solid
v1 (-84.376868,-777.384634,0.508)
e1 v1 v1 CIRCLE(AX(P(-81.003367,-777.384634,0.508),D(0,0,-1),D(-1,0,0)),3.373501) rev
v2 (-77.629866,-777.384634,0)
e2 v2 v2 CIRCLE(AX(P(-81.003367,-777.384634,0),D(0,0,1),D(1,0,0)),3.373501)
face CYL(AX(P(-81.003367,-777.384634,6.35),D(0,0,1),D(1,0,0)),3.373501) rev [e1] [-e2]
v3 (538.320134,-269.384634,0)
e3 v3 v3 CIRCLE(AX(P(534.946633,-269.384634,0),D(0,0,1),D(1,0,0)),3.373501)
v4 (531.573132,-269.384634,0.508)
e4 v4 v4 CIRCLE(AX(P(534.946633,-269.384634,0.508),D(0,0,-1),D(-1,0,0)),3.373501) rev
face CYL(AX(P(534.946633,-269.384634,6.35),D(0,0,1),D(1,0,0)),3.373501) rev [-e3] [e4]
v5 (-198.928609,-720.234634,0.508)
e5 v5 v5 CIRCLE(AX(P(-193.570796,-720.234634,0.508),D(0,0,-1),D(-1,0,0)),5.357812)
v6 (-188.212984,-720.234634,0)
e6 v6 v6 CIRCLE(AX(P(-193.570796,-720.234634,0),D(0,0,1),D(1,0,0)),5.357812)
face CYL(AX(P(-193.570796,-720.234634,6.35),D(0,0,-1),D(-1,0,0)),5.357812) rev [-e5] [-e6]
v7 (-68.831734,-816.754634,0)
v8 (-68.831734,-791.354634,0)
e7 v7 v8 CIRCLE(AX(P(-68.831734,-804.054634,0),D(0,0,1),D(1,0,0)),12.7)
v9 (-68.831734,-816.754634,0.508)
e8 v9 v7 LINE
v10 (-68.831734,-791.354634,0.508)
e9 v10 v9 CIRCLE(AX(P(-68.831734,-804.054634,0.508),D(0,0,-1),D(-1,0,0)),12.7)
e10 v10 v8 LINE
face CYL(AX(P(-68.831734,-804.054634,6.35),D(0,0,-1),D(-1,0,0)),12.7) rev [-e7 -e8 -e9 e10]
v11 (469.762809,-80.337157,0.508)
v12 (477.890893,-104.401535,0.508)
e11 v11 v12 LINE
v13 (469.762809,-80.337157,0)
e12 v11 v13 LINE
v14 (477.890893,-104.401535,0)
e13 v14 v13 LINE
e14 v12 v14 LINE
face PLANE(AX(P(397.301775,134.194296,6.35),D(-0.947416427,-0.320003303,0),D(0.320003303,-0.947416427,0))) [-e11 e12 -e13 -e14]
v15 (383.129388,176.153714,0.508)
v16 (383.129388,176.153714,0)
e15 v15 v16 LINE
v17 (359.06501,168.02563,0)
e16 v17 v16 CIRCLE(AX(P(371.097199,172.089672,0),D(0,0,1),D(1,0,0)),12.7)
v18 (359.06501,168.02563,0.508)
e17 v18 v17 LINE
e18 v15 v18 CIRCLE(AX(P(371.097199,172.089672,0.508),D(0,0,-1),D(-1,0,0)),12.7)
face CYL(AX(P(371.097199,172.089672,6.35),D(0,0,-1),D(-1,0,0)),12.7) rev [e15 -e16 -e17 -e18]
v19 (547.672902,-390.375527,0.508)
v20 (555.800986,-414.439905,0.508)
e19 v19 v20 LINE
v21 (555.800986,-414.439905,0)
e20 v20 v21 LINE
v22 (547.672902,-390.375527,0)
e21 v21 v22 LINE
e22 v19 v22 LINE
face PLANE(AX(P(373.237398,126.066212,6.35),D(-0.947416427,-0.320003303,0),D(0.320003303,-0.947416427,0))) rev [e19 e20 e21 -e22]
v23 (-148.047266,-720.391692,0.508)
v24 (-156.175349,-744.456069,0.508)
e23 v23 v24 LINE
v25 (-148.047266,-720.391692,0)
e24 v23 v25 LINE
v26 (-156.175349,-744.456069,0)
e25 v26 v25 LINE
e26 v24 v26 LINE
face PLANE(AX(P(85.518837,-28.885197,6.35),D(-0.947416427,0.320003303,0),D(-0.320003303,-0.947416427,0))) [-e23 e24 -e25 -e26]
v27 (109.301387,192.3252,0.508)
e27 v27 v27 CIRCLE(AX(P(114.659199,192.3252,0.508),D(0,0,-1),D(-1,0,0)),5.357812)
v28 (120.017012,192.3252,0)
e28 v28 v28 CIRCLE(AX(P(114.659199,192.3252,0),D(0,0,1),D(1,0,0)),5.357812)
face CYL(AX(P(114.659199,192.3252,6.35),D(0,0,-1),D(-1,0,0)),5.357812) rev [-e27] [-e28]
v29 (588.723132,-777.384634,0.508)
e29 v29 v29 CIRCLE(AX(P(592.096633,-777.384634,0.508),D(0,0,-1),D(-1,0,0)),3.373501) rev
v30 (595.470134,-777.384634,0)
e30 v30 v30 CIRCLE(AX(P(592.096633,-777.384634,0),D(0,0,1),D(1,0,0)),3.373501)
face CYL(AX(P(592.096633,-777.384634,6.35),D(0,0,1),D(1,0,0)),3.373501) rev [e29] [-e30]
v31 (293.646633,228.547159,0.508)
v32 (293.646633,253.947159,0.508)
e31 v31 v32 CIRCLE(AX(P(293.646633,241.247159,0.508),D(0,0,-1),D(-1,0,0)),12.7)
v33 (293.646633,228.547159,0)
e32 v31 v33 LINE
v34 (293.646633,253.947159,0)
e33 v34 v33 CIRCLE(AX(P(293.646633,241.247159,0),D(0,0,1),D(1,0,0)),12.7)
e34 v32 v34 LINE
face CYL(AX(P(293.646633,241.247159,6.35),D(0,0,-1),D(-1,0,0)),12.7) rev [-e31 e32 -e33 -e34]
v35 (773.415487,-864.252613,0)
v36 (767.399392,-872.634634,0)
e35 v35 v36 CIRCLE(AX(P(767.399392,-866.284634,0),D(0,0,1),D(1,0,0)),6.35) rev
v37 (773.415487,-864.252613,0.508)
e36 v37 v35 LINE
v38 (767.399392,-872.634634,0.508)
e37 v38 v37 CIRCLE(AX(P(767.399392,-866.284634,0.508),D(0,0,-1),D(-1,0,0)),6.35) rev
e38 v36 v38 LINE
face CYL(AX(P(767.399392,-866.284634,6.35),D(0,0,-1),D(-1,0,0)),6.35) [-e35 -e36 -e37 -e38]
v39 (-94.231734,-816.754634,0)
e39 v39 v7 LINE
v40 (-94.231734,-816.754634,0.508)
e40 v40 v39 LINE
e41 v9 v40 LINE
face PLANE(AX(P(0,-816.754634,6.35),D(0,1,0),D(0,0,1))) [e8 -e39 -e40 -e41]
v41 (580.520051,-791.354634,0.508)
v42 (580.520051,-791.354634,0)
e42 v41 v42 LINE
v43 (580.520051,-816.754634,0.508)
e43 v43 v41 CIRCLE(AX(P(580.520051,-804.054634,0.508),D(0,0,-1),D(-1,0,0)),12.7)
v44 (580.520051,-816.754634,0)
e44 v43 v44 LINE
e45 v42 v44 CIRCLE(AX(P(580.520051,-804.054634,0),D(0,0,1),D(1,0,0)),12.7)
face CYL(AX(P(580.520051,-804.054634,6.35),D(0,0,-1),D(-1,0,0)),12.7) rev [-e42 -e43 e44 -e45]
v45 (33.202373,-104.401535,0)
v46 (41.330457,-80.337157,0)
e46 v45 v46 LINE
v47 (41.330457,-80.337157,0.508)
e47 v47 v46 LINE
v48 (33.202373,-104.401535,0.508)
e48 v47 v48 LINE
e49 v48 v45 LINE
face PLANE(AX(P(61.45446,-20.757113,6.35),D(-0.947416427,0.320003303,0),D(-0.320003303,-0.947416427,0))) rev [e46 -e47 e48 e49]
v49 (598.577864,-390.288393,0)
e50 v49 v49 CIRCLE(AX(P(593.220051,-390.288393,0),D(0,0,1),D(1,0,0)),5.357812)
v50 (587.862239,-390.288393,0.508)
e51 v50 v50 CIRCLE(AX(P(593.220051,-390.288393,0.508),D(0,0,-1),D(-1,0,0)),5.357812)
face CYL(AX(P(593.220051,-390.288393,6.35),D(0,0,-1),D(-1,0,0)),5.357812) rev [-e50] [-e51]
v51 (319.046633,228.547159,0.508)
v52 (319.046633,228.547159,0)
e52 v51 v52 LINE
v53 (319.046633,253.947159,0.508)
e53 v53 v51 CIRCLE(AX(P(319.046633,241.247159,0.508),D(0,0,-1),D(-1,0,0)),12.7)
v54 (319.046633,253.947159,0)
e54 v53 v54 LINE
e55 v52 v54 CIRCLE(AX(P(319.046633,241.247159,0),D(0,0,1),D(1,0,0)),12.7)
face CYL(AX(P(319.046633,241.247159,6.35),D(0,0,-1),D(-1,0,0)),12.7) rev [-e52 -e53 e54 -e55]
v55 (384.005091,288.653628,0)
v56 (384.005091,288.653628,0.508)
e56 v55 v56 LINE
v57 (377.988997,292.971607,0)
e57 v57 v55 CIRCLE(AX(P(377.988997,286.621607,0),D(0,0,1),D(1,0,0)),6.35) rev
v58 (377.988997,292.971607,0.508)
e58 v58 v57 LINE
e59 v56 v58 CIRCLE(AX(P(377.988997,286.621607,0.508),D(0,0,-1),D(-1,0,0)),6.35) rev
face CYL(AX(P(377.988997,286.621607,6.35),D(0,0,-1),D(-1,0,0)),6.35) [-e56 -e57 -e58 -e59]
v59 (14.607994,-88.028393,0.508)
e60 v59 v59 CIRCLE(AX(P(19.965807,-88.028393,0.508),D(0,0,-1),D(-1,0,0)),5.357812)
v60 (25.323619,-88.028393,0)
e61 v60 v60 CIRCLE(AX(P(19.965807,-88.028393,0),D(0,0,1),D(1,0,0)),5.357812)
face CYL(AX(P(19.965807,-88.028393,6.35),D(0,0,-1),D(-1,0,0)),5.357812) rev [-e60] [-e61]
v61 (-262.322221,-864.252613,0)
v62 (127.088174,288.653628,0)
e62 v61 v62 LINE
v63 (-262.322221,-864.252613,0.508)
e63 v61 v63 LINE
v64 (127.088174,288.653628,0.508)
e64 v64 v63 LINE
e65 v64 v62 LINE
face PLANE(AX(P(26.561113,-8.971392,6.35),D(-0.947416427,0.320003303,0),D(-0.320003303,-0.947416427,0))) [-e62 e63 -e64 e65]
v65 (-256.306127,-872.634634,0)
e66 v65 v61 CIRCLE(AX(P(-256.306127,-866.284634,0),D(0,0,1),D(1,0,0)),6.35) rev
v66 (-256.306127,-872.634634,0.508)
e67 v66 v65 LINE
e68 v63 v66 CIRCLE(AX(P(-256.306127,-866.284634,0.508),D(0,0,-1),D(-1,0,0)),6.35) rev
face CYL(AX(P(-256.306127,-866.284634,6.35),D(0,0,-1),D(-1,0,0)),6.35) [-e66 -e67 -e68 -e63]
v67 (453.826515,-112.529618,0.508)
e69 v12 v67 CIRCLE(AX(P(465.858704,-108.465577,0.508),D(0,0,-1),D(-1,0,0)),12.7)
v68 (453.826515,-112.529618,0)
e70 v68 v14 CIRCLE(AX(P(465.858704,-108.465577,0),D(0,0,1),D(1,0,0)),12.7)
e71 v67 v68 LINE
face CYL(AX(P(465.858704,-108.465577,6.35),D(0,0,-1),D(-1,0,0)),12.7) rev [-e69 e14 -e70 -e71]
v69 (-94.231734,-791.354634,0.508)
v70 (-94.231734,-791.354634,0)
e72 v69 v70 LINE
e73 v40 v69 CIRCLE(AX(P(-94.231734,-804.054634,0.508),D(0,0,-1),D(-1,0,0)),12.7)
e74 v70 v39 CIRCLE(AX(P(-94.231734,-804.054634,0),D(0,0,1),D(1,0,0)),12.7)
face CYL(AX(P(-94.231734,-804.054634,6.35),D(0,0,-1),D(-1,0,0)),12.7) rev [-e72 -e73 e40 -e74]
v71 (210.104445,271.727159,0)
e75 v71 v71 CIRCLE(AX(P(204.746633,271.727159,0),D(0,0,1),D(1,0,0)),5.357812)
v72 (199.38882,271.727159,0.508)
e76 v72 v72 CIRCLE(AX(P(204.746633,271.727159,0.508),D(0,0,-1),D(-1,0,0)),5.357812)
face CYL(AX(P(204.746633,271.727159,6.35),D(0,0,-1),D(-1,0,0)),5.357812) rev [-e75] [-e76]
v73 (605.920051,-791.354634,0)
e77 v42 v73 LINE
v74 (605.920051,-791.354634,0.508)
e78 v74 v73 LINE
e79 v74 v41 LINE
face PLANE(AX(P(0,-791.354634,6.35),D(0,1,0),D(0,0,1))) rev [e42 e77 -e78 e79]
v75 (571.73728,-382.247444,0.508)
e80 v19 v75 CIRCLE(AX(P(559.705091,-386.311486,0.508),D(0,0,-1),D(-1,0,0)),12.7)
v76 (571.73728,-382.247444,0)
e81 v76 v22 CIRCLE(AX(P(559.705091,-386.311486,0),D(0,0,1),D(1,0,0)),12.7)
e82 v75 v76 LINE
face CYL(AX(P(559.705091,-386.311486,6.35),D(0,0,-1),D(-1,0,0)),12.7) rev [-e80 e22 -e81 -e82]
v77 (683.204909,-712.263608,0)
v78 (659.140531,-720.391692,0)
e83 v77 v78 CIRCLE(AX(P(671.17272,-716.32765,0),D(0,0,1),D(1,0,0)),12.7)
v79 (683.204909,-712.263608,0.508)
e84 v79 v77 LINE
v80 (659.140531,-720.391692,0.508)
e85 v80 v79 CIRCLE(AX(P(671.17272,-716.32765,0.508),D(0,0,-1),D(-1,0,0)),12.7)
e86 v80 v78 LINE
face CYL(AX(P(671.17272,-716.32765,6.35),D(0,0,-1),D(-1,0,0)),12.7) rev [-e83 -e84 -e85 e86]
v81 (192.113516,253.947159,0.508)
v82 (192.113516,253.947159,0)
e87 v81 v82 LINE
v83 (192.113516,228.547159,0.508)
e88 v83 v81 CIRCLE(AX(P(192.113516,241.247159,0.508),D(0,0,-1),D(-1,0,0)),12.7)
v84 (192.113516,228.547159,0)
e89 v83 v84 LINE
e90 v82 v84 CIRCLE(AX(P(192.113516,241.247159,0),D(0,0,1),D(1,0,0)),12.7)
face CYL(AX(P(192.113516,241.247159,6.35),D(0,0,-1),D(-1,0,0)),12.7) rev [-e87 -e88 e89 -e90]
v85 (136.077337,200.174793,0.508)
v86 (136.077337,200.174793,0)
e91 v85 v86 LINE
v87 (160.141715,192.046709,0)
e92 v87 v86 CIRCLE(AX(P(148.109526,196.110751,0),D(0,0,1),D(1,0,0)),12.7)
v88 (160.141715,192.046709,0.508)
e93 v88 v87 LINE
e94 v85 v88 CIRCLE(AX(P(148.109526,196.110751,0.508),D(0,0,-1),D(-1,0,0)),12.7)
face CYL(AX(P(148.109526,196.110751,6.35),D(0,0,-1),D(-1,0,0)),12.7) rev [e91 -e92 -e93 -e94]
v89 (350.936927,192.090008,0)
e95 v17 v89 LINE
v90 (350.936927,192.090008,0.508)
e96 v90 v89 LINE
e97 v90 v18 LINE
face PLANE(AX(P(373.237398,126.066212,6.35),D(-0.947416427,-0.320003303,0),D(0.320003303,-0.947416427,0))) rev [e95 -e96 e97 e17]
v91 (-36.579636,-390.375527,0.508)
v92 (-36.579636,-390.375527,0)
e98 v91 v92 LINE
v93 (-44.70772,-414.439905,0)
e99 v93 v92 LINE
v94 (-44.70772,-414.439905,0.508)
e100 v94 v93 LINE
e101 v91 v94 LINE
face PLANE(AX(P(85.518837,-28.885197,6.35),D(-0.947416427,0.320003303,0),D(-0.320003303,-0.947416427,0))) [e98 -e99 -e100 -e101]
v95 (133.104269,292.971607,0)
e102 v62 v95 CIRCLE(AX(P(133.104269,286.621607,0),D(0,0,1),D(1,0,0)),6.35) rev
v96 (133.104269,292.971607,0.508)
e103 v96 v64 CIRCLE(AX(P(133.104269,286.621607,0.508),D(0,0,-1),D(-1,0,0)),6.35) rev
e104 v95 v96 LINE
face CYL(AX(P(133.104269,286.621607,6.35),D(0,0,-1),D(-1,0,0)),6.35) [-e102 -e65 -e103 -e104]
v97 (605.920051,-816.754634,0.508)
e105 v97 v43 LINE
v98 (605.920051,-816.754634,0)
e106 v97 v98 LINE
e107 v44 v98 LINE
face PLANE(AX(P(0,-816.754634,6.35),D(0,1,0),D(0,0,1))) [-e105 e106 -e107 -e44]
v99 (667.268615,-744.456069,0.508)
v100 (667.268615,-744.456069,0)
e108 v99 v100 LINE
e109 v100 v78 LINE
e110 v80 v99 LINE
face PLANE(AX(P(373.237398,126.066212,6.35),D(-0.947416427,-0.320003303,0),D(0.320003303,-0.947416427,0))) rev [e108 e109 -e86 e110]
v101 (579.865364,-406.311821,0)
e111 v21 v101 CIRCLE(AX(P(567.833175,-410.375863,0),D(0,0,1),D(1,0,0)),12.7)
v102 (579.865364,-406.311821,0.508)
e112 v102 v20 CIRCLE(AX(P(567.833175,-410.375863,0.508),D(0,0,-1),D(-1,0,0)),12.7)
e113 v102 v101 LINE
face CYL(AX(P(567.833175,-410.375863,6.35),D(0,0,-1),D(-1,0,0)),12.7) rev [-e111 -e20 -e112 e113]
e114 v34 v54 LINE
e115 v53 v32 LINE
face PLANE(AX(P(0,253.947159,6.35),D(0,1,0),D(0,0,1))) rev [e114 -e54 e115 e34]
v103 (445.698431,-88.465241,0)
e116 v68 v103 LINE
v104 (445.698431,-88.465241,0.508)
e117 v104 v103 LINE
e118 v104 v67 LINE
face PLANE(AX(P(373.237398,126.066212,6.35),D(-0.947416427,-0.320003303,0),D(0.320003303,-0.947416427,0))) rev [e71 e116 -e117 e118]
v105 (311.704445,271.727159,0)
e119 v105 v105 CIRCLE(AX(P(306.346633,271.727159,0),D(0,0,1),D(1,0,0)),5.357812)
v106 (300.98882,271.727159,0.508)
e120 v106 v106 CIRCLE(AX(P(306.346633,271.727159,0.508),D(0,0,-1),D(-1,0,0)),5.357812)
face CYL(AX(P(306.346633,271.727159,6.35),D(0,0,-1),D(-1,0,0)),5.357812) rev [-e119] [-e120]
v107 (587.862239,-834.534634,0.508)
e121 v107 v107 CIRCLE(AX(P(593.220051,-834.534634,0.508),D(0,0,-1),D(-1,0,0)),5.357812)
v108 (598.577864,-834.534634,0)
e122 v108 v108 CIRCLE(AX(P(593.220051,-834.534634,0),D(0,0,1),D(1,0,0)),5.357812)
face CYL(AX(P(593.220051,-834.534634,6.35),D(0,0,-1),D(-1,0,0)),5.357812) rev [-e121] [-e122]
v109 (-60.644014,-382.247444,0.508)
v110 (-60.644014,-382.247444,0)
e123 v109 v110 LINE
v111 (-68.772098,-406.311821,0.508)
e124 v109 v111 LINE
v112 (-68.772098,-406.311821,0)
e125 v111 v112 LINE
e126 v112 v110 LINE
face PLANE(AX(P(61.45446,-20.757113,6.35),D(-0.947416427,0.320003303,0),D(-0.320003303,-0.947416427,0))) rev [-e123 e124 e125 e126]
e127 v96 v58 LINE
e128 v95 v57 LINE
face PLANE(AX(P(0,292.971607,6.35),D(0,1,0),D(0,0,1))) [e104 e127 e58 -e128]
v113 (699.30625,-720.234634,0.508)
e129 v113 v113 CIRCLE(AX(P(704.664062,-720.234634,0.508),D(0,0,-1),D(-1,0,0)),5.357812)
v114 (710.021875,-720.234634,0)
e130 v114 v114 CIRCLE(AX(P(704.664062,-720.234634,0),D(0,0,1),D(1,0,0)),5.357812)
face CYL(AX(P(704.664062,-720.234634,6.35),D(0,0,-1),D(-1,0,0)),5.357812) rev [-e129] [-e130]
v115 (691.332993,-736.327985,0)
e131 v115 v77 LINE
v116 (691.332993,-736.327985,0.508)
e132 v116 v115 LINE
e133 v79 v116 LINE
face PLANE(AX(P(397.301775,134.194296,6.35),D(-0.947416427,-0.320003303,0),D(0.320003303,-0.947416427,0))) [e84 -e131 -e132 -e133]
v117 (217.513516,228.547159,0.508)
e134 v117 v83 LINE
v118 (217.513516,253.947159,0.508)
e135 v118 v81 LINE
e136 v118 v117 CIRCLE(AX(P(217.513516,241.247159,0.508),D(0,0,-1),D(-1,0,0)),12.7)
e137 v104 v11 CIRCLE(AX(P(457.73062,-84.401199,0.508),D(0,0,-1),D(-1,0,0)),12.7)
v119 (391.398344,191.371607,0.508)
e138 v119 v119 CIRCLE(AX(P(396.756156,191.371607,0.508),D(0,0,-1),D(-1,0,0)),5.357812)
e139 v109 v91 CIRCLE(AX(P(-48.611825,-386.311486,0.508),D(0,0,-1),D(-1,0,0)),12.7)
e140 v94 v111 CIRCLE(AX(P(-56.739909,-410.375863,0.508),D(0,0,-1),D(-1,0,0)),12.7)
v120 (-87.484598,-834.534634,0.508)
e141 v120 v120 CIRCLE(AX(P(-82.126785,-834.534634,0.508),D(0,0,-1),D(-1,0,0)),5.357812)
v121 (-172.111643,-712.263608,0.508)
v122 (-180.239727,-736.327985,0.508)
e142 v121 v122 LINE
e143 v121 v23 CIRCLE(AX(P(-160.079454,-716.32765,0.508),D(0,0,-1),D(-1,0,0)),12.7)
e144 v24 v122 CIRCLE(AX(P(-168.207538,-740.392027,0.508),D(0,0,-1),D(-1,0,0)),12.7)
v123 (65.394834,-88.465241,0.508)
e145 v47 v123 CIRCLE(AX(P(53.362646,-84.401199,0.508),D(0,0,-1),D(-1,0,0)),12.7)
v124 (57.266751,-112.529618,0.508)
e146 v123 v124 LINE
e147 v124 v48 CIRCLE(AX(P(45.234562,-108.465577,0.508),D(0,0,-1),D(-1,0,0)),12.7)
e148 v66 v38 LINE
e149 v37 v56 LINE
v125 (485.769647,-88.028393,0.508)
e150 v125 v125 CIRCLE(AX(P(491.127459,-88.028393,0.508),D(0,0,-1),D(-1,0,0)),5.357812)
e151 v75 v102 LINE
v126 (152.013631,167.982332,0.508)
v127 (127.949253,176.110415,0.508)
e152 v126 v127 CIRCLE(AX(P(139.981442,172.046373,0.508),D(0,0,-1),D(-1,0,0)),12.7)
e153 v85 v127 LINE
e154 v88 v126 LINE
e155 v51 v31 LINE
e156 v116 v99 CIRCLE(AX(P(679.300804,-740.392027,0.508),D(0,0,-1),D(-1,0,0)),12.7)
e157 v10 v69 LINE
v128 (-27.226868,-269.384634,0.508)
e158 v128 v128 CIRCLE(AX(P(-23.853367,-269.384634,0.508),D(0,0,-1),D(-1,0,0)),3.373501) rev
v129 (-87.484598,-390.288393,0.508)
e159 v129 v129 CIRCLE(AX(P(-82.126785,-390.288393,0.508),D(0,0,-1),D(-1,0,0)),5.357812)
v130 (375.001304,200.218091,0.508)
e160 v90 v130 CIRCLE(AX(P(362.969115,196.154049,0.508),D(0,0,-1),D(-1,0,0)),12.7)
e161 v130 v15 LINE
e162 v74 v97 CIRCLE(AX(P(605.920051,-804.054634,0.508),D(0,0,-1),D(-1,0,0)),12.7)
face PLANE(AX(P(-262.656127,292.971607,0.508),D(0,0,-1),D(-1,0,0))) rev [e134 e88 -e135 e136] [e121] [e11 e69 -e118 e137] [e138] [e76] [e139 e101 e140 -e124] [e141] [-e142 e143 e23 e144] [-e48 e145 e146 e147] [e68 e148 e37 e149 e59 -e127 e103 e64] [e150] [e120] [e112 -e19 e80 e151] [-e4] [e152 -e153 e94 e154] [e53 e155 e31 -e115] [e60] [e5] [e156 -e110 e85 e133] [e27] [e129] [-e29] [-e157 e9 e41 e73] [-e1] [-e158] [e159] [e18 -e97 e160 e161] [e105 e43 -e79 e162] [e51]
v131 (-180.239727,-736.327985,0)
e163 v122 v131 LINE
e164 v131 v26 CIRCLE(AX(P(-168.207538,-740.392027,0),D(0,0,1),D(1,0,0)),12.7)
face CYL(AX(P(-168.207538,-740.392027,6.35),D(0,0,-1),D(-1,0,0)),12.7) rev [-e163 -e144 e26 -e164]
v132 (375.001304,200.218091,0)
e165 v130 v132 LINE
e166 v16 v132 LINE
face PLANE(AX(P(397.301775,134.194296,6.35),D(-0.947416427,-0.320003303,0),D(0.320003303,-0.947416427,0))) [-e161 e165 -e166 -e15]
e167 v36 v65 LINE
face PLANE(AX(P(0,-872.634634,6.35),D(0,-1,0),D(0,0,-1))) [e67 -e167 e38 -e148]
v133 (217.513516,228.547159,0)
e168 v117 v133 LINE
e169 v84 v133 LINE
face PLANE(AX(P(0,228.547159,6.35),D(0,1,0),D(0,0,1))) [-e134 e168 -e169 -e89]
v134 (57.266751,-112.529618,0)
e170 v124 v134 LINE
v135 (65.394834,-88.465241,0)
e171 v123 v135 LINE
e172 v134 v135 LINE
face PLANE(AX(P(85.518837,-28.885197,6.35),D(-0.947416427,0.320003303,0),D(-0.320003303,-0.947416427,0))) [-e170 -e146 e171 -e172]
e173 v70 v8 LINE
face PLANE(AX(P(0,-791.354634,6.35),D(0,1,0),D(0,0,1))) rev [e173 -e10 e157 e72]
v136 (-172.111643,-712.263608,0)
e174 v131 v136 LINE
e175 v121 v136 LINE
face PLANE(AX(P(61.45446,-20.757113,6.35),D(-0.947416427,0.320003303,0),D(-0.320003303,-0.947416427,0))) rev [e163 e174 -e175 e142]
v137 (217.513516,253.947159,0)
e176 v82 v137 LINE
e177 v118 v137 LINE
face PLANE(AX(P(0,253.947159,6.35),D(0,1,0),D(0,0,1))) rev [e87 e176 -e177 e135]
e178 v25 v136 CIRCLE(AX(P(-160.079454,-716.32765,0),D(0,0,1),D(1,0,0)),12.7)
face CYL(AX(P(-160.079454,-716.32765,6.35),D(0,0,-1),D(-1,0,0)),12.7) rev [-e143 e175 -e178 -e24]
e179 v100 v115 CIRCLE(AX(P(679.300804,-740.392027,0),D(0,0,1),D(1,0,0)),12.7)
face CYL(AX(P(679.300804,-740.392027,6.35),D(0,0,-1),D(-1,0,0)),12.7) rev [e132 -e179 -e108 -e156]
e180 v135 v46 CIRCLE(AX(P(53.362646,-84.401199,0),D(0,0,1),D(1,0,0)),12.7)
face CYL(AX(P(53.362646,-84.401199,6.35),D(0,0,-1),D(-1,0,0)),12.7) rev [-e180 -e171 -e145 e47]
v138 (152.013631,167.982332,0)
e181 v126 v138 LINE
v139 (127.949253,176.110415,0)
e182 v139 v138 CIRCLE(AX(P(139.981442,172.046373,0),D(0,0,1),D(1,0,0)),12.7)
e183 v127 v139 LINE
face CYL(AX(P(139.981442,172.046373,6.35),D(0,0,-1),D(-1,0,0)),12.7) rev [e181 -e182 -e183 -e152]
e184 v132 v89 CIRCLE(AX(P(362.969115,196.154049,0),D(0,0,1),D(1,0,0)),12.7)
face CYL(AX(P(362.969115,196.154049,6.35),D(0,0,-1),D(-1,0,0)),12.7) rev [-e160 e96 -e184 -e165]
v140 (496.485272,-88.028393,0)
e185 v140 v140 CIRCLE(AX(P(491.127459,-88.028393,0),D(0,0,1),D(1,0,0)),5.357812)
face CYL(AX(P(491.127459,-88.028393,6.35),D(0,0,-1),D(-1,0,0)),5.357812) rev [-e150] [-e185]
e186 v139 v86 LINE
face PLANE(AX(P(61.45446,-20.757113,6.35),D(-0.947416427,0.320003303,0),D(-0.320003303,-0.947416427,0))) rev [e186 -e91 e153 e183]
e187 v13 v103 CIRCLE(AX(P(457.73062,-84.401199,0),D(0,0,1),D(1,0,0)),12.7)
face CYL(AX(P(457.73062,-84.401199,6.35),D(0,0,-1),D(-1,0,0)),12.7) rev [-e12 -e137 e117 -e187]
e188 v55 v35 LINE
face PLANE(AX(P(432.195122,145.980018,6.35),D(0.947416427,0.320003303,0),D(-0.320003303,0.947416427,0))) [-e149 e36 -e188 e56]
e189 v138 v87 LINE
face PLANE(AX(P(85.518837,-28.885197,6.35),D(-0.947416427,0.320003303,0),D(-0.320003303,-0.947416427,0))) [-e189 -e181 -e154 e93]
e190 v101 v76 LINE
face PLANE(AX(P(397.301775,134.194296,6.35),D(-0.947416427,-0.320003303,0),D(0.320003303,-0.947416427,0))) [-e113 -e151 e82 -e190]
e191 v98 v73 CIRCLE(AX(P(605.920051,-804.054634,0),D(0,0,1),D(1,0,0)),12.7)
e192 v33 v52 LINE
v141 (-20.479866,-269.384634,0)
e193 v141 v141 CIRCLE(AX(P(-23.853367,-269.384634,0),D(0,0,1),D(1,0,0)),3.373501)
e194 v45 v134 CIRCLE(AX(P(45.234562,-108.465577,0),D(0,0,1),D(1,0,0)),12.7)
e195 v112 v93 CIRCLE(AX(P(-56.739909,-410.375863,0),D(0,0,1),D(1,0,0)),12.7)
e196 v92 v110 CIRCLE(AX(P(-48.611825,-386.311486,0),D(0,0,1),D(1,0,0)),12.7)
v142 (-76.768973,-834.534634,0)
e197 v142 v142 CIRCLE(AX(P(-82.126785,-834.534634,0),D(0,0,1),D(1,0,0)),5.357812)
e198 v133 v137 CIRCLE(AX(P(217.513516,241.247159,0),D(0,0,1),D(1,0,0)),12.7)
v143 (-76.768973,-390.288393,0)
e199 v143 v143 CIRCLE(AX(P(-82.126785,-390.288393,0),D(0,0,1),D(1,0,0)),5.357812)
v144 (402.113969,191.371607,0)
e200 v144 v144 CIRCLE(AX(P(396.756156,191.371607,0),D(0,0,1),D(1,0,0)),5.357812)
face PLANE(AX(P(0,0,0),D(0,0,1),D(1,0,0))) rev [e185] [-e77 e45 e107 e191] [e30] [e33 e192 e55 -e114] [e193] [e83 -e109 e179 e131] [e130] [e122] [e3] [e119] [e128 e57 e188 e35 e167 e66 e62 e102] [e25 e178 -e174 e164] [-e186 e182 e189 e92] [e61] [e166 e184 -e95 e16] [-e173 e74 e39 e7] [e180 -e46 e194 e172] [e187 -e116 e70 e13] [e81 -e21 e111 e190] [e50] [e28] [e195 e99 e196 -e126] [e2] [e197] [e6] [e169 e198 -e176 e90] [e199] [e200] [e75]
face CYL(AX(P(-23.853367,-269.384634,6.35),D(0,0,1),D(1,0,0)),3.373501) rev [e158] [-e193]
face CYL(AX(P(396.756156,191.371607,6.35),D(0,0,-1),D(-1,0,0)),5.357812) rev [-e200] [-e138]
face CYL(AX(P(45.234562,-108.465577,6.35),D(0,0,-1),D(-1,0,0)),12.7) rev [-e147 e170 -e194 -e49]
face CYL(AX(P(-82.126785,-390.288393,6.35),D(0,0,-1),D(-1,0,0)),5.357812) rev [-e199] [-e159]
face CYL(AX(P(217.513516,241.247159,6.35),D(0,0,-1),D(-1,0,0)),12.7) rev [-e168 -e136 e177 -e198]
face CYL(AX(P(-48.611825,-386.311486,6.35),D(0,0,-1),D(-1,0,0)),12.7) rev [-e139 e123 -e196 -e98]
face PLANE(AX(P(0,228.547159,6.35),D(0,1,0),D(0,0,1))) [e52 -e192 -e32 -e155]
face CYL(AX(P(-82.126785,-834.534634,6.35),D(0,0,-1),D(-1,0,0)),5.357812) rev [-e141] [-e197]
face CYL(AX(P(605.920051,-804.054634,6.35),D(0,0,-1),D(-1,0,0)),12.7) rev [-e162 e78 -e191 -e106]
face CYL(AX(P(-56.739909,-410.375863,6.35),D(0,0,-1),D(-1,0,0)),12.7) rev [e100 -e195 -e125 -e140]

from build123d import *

# Parameters (mm, degrees)
GE_24334_OUTLINE_R   = 5.3578125
GE_24334_OUTLINE_R_2 = 3.373501
GE_24334_DEPTH       = 6.35
SKETCH1_W            = 1036.405519013
SKETCH1_H            = 5.842
CUT_EXTRUDE1_DEPTH   = 1400.059095494


# Read off the part's stored shape, not the designer's step: GE-24334
with BuildPart() as part:
    # GE-24334 outline → GE-24334 (new body)
    with BuildSketch(Plane.XY):
        with BuildLine():
            ThreePointArc((133.104268735, 292.971606529), (129.401623275, 291.780377371), (127.088174424, 288.653627505))
            Line((127.088174424, 288.653627505), (-262.322220882, -864.25261299))
            ThreePointArc((-262.322220882, -864.25261299), (-261.464897413, -869.987279425), (-256.306126571, -872.634633965))
            Line((-256.306126571, -872.634633965), (767.399392442, -872.634633965))
            ThreePointArc((767.399392442, -872.634633965), (772.558163284, -869.987279425), (773.415486753, -864.25261299))
            Line((773.415486753, -864.25261299), (384.005091446, 288.653627505))
            ThreePointArc((384.005091446, 288.653627505), (381.691642596, 291.780377371), (377.988997136, 292.971606529))
            Line((377.988997136, 292.971606529), (133.104268735, 292.971606529))
        make_face()
        with BuildLine():
            Line((-180.239726648, -736.327985402), (-172.111642745, -712.26360816))
            ThreePointArc((-172.111642745, -712.26360816), (-156.015412172, -704.29546149), (-148.047265502, -720.391692063))
            Line((-148.047265502, -720.391692063), (-156.175349405, -744.456069305))
            ThreePointArc((-156.175349405, -744.456069305), (-172.271579978, -752.424215975), (-180.239726648, -736.327985402))
        make_face(mode=Mode.SUBTRACT)
        with Locations((-82.126785136, -834.534633965)):
            Circle(GE_24334_OUTLINE_R, mode=Mode.SUBTRACT)
        with BuildLine():
            Line((-94.231734473, -791.354633965), (-68.831734473, -791.354633965))
            ThreePointArc((-68.831734473, -791.354633965), (-56.131734473, -804.054633965), (-68.831734473, -816.754633965))
            Line((-68.831734473, -816.754633965), (-94.231734473, -816.754633965))
            ThreePointArc((-94.231734473, -816.754633965), (-106.931734473, -804.054633965), (-94.231734473, -791.354633965))
        make_face(mode=Mode.SUBTRACT)
        with Locations((-81.003367065, -777.384633965)):
            Circle(GE_24334_OUTLINE_R_2, mode=Mode.SUBTRACT)
        with Locations((-193.570796303, -720.234633965)):
            Circle(GE_24334_OUTLINE_R, mode=Mode.SUBTRACT)
        with Locations((-82.126785136, -390.288393471)):
            Circle(GE_24334_OUTLINE_R, mode=Mode.SUBTRACT)
        with BuildLine():
            Line((-68.772097635, -406.311820835), (-60.644013732, -382.247443592))
            ThreePointArc((-60.644013732, -382.247443592), (-44.54778316, -374.279296923), (-36.57963649, -390.375527495))
            Line((-36.57963649, -390.375527495), (-44.707720392, -414.439904738))
            ThreePointArc((-44.707720392, -414.439904738), (-60.803950965, -422.408051408), (-68.772097635, -406.311820835))
        make_face(mode=Mode.SUBTRACT)
        with Locations((593.220051006, -834.534633965)):
            Circle(GE_24334_OUTLINE_R, mode=Mode.SUBTRACT)
        with BuildLine():
            Line((580.520051006, -791.354633965), (605.920051006, -791.354633965))
            ThreePointArc((605.920051006, -791.354633965), (618.620051006, -804.054633965), (605.920051006, -816.754633965))
            Line((605.920051006, -816.754633965), (580.520051006, -816.754633965))
            ThreePointArc((580.520051006, -816.754633965), (567.820051006, -804.054633965), (580.520051006, -791.354633965))
        make_face(mode=Mode.SUBTRACT)
        with Locations((592.096632935, -777.384633965)):
            Circle(GE_24334_OUTLINE_R_2, mode=Mode.SUBTRACT)
        with BuildLine():
            Line((667.268615276, -744.456069305), (659.140531373, -720.391692063))
            ThreePointArc((659.140531373, -720.391692063), (667.108678043, -704.29546149), (683.204908616, -712.26360816))
            Line((683.204908616, -712.26360816), (691.332992518, -736.327985402))
            ThreePointArc((691.332992518, -736.327985402), (683.364845849, -752.424215975), (667.268615276, -744.456069305))
        make_face(mode=Mode.SUBTRACT)
        with Locations((704.664062174, -720.234633965)):
            Circle(GE_24334_OUTLINE_R, mode=Mode.SUBTRACT)
        with BuildLine():
            Line((555.800986263, -414.439904738), (547.67290236, -390.375527495))
            ThreePointArc((547.67290236, -390.375527495), (555.64104903, -374.279296923), (571.737279603, -382.247443592))
            Line((571.737279603, -382.247443592), (579.865363506, -406.311820835))
            ThreePointArc((579.865363506, -406.311820835), (571.897216836, -422.408051408), (555.800986263, -414.439904738))
        make_face(mode=Mode.SUBTRACT)
        with Locations((593.220051006, -390.288393471)):
            Circle(GE_24334_OUTLINE_R, mode=Mode.SUBTRACT)
        with Locations((-23.853367065, -269.384633965)):
            Circle(GE_24334_OUTLINE_R_2, mode=Mode.SUBTRACT)
        with Locations((19.96580657, -88.028393471)):
            Circle(GE_24334_OUTLINE_R, mode=Mode.SUBTRACT)
        with BuildLine():
            Line((33.202373314, -104.401534553), (41.330457217, -80.33715731))
            ThreePointArc((41.330457217, -80.33715731), (57.42668779, -72.36901064), (65.394834459, -88.465241213))
            Line((65.394834459, -88.465241213), (57.266750557, -112.529618456))
            ThreePointArc((57.266750557, -112.529618456), (41.170519984, -120.497765125), (33.202373314, -104.401534553))
        make_face(mode=Mode.SUBTRACT)
        with Locations((114.659199441, 192.325199783)):
            Circle(GE_24334_OUTLINE_R, mode=Mode.SUBTRACT)
        with BuildLine():
            Line((127.949253412, 176.110415433), (136.077337315, 200.174792676))
            ThreePointArc((136.077337315, 200.174792676), (152.173567887, 208.142939345), (160.141714557, 192.046708773))
            Line((160.141714557, 192.046708773), (152.013630654, 167.98233153))
            ThreePointArc((152.013630654, 167.98233153), (135.917400081, 160.01418486), (127.949253412, 176.110415433))
        make_face(mode=Mode.SUBTRACT)
        with BuildLine():
            Line((192.113515822, 253.947158802), (217.513515822, 253.947158802))
            ThreePointArc((217.513515822, 253.947158802), (230.213515822, 241.247158802), (217.513515822, 228.547158802))
            Line((217.513515822, 228.547158802), (192.113515822, 228.547158802))
            ThreePointArc((192.113515822, 228.547158802), (179.413515822, 241.247158802), (192.113515822, 253.947158802))
        make_face(mode=Mode.SUBTRACT)
        with Locations((204.746632935, 271.727158802)):
            Circle(GE_24334_OUTLINE_R, mode=Mode.SUBTRACT)
        with BuildLine():
            Line((453.826515314, -112.529618456), (445.698431411, -88.465241213))
            ThreePointArc((445.698431411, -88.465241213), (453.666578081, -72.36901064), (469.762808654, -80.33715731))
            Line((469.762808654, -80.33715731), (477.890892557, -104.401534553))
            ThreePointArc((477.890892557, -104.401534553), (469.922745887, -120.497765125), (453.826515314, -112.529618456))
        make_face(mode=Mode.SUBTRACT)
        with Locations((491.127459301, -88.028393471)):
            Circle(GE_24334_OUTLINE_R, mode=Mode.SUBTRACT)
        with Locations((534.946632935, -269.384633965)):
            Circle(GE_24334_OUTLINE_R_2, mode=Mode.SUBTRACT)
        with BuildLine():
            Line((359.065010443, 168.025630302), (350.936926541, 192.090007545))
            ThreePointArc((350.936926541, 192.090007545), (358.90507321, 208.186238118), (375.001303783, 200.218091448))
            Line((375.001303783, 200.218091448), (383.129387686, 176.153714205))
            ThreePointArc((383.129387686, 176.153714205), (375.161241016, 160.057483633), (359.065010443, 168.025630302))
        make_face(mode=Mode.SUBTRACT)
        with BuildLine():
            Line((293.646632935, 253.947158802), (319.046632935, 253.947158802))
            ThreePointArc((319.046632935, 253.947158802), (331.746632935, 241.247158802), (319.046632935, 228.547158802))
            Line((319.046632935, 228.547158802), (293.646632935, 228.547158802))
            ThreePointArc((293.646632935, 228.547158802), (280.946632935, 241.247158802), (293.646632935, 253.947158802))
        make_face(mode=Mode.SUBTRACT)
        with Locations((306.346632935, 271.727158802)):
            Circle(GE_24334_OUTLINE_R, mode=Mode.SUBTRACT)
        with Locations((396.756156044, 191.371606529)):
            Circle(GE_24334_OUTLINE_R, mode=Mode.SUBTRACT)
    extrude(amount=GE_24334_DEPTH)

    # Sketch1 → Cut-Extrude1 (cut, through all)
    with BuildSketch(Plane.XZ.offset(872.634633965)):
        with Locations((255.546632936, 3.429)):
            Rectangle(SKETCH1_W, SKETCH1_H)
    extrude(amount=-CUT_EXTRUDE1_DEPTH, mode=Mode.SUBTRACT)


solid = part.part
